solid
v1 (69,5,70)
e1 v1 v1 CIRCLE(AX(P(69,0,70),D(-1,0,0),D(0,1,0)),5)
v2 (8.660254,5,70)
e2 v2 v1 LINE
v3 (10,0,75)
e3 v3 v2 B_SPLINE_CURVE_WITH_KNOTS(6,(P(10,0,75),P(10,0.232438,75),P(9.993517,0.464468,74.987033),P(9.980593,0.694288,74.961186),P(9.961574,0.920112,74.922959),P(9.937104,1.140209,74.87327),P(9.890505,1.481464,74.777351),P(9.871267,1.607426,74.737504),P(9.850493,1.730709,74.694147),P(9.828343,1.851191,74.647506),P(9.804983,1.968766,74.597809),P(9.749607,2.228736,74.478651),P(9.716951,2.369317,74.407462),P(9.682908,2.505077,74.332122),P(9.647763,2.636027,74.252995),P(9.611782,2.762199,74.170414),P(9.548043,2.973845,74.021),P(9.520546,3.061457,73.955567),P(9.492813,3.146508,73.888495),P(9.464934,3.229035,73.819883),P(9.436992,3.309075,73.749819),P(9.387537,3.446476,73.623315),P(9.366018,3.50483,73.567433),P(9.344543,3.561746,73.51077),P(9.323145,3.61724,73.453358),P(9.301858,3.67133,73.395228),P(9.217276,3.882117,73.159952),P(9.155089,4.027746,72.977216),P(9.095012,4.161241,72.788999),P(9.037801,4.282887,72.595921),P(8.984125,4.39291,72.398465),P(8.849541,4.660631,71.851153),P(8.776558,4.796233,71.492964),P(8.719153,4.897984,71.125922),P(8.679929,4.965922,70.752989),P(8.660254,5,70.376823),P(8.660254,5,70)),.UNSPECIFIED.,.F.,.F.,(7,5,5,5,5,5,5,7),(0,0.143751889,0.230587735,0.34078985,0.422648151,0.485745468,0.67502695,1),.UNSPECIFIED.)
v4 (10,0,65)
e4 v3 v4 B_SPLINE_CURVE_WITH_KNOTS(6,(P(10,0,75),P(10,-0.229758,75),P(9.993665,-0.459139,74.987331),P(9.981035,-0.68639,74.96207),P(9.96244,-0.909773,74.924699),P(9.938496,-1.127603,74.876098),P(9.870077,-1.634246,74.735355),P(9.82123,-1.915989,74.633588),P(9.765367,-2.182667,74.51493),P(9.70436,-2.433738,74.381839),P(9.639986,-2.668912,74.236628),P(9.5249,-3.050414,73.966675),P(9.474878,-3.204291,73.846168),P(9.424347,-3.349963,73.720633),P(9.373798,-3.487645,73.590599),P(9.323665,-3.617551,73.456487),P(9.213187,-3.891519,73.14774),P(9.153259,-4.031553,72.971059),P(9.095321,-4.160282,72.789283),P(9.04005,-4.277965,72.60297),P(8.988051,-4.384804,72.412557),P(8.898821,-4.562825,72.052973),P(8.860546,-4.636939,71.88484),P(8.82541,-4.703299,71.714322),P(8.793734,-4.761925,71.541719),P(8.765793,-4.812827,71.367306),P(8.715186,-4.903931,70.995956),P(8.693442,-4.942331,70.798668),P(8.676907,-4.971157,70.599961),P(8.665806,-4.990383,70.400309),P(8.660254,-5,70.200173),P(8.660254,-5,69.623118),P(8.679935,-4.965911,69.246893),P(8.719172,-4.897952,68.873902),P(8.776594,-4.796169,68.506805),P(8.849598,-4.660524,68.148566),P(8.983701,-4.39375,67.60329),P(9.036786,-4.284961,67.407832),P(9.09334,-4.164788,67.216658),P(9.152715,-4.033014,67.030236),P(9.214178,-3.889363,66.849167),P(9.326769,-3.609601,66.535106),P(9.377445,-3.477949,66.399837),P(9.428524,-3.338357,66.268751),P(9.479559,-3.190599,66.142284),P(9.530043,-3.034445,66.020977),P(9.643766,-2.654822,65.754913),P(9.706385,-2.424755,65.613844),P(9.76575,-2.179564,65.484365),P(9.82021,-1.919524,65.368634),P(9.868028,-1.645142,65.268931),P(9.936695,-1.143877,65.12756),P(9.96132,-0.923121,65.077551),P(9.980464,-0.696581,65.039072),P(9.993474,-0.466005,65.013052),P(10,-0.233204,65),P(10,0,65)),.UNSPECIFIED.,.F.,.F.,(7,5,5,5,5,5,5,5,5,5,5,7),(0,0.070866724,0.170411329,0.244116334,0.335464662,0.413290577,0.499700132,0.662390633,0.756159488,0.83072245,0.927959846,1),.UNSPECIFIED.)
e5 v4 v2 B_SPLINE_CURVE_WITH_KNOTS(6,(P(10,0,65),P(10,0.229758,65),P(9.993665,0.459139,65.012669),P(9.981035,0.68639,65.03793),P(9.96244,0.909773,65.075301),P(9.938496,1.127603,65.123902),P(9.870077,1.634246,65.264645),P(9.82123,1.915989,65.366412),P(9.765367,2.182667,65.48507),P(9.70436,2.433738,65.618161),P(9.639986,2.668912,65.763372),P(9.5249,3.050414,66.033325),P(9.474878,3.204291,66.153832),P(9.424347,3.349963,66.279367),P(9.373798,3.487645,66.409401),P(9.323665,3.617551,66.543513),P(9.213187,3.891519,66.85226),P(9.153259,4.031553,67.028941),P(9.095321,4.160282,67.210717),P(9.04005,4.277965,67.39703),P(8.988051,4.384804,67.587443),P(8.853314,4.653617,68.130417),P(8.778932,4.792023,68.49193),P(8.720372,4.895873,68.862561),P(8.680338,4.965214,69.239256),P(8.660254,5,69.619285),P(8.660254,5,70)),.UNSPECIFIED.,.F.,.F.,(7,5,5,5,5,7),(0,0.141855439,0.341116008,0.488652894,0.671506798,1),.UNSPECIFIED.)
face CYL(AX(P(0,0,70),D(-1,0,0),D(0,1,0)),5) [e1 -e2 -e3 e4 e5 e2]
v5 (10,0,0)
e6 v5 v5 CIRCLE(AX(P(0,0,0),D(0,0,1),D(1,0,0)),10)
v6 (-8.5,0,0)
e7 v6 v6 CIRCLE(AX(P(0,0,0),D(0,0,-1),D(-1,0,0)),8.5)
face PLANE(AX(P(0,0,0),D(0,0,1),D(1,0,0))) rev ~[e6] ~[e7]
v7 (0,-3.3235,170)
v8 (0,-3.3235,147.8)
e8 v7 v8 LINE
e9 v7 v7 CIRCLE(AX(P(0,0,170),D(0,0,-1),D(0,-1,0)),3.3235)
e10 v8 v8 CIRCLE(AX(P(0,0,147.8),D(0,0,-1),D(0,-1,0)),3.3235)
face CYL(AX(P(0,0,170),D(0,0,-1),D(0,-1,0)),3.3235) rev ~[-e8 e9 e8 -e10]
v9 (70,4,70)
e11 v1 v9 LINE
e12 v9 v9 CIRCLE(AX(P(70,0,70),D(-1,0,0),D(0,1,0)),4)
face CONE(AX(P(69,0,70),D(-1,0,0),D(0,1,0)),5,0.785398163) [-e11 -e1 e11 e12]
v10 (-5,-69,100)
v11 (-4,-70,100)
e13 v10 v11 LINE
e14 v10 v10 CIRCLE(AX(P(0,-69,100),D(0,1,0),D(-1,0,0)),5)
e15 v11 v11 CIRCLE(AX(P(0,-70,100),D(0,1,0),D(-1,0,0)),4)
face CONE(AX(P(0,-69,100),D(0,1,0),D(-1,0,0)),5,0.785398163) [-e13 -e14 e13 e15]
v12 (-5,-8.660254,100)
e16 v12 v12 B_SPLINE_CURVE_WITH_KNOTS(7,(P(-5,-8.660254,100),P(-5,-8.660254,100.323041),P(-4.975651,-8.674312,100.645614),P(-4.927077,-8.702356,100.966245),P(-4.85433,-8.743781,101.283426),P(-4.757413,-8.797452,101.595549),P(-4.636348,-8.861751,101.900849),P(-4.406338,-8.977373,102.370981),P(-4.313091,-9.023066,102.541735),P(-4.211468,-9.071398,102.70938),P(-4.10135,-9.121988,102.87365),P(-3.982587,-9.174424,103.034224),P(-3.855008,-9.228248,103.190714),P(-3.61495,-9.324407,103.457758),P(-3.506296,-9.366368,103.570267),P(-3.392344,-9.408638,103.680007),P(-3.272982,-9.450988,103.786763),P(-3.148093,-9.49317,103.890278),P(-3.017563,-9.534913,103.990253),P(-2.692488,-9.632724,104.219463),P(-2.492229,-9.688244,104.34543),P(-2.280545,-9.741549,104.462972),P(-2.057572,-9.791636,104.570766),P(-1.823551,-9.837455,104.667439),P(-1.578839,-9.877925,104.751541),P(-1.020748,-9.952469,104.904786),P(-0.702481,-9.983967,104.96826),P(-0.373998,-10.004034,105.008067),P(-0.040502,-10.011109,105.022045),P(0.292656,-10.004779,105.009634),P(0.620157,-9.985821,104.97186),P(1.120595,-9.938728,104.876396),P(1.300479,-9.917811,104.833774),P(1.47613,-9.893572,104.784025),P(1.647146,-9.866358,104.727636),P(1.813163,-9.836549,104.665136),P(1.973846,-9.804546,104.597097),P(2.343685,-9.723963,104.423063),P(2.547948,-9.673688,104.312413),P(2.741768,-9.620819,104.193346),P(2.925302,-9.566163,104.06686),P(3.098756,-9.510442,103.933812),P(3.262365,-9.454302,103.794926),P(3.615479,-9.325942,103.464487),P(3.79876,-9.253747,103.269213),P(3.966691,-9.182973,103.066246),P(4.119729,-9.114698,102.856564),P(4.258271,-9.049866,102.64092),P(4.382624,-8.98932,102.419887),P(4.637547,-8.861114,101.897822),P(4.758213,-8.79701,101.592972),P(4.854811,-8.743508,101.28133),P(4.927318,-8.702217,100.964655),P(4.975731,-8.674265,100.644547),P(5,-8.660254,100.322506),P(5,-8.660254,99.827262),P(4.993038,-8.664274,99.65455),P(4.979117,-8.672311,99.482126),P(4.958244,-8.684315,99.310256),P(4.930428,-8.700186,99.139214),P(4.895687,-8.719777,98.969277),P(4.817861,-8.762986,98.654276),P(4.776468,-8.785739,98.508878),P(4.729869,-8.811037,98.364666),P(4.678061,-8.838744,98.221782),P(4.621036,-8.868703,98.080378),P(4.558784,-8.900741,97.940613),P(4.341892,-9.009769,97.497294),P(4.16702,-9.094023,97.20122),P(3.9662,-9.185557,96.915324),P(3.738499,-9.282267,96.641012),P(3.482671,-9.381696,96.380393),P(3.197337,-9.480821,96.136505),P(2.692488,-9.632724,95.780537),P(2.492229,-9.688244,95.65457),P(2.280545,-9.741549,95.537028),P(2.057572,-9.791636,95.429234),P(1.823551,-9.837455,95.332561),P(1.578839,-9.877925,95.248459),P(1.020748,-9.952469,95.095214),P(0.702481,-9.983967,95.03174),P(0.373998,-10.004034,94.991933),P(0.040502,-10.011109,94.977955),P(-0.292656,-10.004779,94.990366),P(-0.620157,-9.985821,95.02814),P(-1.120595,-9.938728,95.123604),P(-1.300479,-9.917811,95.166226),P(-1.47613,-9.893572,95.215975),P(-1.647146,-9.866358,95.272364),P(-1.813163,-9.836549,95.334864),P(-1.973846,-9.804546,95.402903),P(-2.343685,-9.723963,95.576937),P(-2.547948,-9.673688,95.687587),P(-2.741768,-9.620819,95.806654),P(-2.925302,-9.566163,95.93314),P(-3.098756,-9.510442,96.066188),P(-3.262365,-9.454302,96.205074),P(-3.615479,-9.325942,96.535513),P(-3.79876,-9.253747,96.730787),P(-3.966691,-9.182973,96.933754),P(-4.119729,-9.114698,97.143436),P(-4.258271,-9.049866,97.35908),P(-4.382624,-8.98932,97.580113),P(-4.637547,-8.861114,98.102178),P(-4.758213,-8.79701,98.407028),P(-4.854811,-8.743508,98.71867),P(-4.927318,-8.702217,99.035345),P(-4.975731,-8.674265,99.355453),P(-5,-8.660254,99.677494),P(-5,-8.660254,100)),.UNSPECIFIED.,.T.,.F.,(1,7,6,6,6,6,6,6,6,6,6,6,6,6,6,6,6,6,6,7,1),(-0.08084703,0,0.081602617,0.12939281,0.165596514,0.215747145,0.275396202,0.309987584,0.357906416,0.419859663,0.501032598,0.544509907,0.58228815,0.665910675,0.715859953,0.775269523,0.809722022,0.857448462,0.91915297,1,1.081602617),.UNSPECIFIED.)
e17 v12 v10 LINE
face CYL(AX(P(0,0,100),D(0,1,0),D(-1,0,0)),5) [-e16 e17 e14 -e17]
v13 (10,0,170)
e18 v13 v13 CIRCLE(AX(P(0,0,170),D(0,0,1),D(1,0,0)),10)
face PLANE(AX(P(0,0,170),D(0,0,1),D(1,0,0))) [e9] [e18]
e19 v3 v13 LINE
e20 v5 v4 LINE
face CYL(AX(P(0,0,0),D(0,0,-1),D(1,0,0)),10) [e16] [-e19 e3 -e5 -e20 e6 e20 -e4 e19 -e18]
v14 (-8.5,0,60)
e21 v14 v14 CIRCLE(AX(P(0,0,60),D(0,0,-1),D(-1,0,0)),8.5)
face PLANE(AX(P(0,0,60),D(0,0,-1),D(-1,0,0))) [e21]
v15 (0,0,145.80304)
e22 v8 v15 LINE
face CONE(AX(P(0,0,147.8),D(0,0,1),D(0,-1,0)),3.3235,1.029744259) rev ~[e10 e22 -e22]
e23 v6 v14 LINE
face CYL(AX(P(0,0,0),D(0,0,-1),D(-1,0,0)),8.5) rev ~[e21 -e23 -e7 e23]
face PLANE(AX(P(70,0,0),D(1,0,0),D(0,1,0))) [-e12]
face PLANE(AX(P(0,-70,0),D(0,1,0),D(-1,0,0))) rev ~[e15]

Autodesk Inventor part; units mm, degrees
ref_plane "YZ Plane" through (0, 0, 0) normal (1, 0, 0) x (0, 1, 0)
ref_plane "XZ Plane" through (0, 0, 0) normal (0, 1, 0) x (-1, 0, 0)
ref_plane "XY Plane" through (0, 0, 0) normal (0, 0, 1) x (1, 0, 0)
sketch "Skizze1" plane through (0, 0, 0) normal (0, 0, 1) x (1, 0, 0)
  circle A0 centre (0, 0) radius 10
  dimension "d0" = 20
extrude "Extrusion1" add sketch "Skizze1" along normal blind 170
sketch "Skizze5" plane through (0, 0, 0) normal (0, 1, 0) x (-1, 0, 0)
  circle A0 centre (0, 100) radius 5
  line L0 (0, -21) -> (0, 126) projected
  line L1 (7, 0) -> (-7, 0) projected
  point P0 (0, 0)
  dimension "d11" = 10
  dimension "d12" = 0
  dimension "d13" = 100
extrude "Extrusion4" add sketch "Skizze5" against normal blind 70
sketch "Skizze6" plane through (0, 0, 0) normal (1, 0, 0) x (0, 1, 0)
  line L0 (10, 170) -> (-10, 170) projected
  line L1 (0, 170) -> (0, 70)
  circle A0 centre (0, 70) radius 5
  point P0 (0, 0)
  dimension "d17" = 100
  dimension "d18" = 10
extrude "Extrusion5" add sketch "Skizze6" along normal blind 70
sketch "Skizze7" plane through (0, 0, 0) normal (0, 0, -1) x (-1, 0, 0)
  circle A0 centre (0, 0) radius 8.5
extrude "Extrusion6" cut sketch "Skizze7" against normal blind 60
thread "Gewinde1" size "M10x1.5" class "6g" standard "ANSI Metric M Profile" length 20
thread "Gewinde2" size "M10x1.5" class "6g" standard "ANSI Metric M Profile" length 20
chamfer "Fasen1" distance 1 angle 45 1 edges at (5, -70, 100)
chamfer "Fasen2" distance 1 angle 45 1 edges at (70, -5, 70)
sketch "Skizze8" plane through (0, 0, 170) normal (0, 0, 1) x (1, 0, 0)
  point P0 (0, 0)
hole "Bohrung1" at (0, 0, 170) direction (0, 0, -1) diameter 6.647 depth 22.2 tip angle 118 thread size "M8x1.25" class "6H" standard "ISO Metric profile"
properties part number "HTW-000681" material "Edelstahl"
